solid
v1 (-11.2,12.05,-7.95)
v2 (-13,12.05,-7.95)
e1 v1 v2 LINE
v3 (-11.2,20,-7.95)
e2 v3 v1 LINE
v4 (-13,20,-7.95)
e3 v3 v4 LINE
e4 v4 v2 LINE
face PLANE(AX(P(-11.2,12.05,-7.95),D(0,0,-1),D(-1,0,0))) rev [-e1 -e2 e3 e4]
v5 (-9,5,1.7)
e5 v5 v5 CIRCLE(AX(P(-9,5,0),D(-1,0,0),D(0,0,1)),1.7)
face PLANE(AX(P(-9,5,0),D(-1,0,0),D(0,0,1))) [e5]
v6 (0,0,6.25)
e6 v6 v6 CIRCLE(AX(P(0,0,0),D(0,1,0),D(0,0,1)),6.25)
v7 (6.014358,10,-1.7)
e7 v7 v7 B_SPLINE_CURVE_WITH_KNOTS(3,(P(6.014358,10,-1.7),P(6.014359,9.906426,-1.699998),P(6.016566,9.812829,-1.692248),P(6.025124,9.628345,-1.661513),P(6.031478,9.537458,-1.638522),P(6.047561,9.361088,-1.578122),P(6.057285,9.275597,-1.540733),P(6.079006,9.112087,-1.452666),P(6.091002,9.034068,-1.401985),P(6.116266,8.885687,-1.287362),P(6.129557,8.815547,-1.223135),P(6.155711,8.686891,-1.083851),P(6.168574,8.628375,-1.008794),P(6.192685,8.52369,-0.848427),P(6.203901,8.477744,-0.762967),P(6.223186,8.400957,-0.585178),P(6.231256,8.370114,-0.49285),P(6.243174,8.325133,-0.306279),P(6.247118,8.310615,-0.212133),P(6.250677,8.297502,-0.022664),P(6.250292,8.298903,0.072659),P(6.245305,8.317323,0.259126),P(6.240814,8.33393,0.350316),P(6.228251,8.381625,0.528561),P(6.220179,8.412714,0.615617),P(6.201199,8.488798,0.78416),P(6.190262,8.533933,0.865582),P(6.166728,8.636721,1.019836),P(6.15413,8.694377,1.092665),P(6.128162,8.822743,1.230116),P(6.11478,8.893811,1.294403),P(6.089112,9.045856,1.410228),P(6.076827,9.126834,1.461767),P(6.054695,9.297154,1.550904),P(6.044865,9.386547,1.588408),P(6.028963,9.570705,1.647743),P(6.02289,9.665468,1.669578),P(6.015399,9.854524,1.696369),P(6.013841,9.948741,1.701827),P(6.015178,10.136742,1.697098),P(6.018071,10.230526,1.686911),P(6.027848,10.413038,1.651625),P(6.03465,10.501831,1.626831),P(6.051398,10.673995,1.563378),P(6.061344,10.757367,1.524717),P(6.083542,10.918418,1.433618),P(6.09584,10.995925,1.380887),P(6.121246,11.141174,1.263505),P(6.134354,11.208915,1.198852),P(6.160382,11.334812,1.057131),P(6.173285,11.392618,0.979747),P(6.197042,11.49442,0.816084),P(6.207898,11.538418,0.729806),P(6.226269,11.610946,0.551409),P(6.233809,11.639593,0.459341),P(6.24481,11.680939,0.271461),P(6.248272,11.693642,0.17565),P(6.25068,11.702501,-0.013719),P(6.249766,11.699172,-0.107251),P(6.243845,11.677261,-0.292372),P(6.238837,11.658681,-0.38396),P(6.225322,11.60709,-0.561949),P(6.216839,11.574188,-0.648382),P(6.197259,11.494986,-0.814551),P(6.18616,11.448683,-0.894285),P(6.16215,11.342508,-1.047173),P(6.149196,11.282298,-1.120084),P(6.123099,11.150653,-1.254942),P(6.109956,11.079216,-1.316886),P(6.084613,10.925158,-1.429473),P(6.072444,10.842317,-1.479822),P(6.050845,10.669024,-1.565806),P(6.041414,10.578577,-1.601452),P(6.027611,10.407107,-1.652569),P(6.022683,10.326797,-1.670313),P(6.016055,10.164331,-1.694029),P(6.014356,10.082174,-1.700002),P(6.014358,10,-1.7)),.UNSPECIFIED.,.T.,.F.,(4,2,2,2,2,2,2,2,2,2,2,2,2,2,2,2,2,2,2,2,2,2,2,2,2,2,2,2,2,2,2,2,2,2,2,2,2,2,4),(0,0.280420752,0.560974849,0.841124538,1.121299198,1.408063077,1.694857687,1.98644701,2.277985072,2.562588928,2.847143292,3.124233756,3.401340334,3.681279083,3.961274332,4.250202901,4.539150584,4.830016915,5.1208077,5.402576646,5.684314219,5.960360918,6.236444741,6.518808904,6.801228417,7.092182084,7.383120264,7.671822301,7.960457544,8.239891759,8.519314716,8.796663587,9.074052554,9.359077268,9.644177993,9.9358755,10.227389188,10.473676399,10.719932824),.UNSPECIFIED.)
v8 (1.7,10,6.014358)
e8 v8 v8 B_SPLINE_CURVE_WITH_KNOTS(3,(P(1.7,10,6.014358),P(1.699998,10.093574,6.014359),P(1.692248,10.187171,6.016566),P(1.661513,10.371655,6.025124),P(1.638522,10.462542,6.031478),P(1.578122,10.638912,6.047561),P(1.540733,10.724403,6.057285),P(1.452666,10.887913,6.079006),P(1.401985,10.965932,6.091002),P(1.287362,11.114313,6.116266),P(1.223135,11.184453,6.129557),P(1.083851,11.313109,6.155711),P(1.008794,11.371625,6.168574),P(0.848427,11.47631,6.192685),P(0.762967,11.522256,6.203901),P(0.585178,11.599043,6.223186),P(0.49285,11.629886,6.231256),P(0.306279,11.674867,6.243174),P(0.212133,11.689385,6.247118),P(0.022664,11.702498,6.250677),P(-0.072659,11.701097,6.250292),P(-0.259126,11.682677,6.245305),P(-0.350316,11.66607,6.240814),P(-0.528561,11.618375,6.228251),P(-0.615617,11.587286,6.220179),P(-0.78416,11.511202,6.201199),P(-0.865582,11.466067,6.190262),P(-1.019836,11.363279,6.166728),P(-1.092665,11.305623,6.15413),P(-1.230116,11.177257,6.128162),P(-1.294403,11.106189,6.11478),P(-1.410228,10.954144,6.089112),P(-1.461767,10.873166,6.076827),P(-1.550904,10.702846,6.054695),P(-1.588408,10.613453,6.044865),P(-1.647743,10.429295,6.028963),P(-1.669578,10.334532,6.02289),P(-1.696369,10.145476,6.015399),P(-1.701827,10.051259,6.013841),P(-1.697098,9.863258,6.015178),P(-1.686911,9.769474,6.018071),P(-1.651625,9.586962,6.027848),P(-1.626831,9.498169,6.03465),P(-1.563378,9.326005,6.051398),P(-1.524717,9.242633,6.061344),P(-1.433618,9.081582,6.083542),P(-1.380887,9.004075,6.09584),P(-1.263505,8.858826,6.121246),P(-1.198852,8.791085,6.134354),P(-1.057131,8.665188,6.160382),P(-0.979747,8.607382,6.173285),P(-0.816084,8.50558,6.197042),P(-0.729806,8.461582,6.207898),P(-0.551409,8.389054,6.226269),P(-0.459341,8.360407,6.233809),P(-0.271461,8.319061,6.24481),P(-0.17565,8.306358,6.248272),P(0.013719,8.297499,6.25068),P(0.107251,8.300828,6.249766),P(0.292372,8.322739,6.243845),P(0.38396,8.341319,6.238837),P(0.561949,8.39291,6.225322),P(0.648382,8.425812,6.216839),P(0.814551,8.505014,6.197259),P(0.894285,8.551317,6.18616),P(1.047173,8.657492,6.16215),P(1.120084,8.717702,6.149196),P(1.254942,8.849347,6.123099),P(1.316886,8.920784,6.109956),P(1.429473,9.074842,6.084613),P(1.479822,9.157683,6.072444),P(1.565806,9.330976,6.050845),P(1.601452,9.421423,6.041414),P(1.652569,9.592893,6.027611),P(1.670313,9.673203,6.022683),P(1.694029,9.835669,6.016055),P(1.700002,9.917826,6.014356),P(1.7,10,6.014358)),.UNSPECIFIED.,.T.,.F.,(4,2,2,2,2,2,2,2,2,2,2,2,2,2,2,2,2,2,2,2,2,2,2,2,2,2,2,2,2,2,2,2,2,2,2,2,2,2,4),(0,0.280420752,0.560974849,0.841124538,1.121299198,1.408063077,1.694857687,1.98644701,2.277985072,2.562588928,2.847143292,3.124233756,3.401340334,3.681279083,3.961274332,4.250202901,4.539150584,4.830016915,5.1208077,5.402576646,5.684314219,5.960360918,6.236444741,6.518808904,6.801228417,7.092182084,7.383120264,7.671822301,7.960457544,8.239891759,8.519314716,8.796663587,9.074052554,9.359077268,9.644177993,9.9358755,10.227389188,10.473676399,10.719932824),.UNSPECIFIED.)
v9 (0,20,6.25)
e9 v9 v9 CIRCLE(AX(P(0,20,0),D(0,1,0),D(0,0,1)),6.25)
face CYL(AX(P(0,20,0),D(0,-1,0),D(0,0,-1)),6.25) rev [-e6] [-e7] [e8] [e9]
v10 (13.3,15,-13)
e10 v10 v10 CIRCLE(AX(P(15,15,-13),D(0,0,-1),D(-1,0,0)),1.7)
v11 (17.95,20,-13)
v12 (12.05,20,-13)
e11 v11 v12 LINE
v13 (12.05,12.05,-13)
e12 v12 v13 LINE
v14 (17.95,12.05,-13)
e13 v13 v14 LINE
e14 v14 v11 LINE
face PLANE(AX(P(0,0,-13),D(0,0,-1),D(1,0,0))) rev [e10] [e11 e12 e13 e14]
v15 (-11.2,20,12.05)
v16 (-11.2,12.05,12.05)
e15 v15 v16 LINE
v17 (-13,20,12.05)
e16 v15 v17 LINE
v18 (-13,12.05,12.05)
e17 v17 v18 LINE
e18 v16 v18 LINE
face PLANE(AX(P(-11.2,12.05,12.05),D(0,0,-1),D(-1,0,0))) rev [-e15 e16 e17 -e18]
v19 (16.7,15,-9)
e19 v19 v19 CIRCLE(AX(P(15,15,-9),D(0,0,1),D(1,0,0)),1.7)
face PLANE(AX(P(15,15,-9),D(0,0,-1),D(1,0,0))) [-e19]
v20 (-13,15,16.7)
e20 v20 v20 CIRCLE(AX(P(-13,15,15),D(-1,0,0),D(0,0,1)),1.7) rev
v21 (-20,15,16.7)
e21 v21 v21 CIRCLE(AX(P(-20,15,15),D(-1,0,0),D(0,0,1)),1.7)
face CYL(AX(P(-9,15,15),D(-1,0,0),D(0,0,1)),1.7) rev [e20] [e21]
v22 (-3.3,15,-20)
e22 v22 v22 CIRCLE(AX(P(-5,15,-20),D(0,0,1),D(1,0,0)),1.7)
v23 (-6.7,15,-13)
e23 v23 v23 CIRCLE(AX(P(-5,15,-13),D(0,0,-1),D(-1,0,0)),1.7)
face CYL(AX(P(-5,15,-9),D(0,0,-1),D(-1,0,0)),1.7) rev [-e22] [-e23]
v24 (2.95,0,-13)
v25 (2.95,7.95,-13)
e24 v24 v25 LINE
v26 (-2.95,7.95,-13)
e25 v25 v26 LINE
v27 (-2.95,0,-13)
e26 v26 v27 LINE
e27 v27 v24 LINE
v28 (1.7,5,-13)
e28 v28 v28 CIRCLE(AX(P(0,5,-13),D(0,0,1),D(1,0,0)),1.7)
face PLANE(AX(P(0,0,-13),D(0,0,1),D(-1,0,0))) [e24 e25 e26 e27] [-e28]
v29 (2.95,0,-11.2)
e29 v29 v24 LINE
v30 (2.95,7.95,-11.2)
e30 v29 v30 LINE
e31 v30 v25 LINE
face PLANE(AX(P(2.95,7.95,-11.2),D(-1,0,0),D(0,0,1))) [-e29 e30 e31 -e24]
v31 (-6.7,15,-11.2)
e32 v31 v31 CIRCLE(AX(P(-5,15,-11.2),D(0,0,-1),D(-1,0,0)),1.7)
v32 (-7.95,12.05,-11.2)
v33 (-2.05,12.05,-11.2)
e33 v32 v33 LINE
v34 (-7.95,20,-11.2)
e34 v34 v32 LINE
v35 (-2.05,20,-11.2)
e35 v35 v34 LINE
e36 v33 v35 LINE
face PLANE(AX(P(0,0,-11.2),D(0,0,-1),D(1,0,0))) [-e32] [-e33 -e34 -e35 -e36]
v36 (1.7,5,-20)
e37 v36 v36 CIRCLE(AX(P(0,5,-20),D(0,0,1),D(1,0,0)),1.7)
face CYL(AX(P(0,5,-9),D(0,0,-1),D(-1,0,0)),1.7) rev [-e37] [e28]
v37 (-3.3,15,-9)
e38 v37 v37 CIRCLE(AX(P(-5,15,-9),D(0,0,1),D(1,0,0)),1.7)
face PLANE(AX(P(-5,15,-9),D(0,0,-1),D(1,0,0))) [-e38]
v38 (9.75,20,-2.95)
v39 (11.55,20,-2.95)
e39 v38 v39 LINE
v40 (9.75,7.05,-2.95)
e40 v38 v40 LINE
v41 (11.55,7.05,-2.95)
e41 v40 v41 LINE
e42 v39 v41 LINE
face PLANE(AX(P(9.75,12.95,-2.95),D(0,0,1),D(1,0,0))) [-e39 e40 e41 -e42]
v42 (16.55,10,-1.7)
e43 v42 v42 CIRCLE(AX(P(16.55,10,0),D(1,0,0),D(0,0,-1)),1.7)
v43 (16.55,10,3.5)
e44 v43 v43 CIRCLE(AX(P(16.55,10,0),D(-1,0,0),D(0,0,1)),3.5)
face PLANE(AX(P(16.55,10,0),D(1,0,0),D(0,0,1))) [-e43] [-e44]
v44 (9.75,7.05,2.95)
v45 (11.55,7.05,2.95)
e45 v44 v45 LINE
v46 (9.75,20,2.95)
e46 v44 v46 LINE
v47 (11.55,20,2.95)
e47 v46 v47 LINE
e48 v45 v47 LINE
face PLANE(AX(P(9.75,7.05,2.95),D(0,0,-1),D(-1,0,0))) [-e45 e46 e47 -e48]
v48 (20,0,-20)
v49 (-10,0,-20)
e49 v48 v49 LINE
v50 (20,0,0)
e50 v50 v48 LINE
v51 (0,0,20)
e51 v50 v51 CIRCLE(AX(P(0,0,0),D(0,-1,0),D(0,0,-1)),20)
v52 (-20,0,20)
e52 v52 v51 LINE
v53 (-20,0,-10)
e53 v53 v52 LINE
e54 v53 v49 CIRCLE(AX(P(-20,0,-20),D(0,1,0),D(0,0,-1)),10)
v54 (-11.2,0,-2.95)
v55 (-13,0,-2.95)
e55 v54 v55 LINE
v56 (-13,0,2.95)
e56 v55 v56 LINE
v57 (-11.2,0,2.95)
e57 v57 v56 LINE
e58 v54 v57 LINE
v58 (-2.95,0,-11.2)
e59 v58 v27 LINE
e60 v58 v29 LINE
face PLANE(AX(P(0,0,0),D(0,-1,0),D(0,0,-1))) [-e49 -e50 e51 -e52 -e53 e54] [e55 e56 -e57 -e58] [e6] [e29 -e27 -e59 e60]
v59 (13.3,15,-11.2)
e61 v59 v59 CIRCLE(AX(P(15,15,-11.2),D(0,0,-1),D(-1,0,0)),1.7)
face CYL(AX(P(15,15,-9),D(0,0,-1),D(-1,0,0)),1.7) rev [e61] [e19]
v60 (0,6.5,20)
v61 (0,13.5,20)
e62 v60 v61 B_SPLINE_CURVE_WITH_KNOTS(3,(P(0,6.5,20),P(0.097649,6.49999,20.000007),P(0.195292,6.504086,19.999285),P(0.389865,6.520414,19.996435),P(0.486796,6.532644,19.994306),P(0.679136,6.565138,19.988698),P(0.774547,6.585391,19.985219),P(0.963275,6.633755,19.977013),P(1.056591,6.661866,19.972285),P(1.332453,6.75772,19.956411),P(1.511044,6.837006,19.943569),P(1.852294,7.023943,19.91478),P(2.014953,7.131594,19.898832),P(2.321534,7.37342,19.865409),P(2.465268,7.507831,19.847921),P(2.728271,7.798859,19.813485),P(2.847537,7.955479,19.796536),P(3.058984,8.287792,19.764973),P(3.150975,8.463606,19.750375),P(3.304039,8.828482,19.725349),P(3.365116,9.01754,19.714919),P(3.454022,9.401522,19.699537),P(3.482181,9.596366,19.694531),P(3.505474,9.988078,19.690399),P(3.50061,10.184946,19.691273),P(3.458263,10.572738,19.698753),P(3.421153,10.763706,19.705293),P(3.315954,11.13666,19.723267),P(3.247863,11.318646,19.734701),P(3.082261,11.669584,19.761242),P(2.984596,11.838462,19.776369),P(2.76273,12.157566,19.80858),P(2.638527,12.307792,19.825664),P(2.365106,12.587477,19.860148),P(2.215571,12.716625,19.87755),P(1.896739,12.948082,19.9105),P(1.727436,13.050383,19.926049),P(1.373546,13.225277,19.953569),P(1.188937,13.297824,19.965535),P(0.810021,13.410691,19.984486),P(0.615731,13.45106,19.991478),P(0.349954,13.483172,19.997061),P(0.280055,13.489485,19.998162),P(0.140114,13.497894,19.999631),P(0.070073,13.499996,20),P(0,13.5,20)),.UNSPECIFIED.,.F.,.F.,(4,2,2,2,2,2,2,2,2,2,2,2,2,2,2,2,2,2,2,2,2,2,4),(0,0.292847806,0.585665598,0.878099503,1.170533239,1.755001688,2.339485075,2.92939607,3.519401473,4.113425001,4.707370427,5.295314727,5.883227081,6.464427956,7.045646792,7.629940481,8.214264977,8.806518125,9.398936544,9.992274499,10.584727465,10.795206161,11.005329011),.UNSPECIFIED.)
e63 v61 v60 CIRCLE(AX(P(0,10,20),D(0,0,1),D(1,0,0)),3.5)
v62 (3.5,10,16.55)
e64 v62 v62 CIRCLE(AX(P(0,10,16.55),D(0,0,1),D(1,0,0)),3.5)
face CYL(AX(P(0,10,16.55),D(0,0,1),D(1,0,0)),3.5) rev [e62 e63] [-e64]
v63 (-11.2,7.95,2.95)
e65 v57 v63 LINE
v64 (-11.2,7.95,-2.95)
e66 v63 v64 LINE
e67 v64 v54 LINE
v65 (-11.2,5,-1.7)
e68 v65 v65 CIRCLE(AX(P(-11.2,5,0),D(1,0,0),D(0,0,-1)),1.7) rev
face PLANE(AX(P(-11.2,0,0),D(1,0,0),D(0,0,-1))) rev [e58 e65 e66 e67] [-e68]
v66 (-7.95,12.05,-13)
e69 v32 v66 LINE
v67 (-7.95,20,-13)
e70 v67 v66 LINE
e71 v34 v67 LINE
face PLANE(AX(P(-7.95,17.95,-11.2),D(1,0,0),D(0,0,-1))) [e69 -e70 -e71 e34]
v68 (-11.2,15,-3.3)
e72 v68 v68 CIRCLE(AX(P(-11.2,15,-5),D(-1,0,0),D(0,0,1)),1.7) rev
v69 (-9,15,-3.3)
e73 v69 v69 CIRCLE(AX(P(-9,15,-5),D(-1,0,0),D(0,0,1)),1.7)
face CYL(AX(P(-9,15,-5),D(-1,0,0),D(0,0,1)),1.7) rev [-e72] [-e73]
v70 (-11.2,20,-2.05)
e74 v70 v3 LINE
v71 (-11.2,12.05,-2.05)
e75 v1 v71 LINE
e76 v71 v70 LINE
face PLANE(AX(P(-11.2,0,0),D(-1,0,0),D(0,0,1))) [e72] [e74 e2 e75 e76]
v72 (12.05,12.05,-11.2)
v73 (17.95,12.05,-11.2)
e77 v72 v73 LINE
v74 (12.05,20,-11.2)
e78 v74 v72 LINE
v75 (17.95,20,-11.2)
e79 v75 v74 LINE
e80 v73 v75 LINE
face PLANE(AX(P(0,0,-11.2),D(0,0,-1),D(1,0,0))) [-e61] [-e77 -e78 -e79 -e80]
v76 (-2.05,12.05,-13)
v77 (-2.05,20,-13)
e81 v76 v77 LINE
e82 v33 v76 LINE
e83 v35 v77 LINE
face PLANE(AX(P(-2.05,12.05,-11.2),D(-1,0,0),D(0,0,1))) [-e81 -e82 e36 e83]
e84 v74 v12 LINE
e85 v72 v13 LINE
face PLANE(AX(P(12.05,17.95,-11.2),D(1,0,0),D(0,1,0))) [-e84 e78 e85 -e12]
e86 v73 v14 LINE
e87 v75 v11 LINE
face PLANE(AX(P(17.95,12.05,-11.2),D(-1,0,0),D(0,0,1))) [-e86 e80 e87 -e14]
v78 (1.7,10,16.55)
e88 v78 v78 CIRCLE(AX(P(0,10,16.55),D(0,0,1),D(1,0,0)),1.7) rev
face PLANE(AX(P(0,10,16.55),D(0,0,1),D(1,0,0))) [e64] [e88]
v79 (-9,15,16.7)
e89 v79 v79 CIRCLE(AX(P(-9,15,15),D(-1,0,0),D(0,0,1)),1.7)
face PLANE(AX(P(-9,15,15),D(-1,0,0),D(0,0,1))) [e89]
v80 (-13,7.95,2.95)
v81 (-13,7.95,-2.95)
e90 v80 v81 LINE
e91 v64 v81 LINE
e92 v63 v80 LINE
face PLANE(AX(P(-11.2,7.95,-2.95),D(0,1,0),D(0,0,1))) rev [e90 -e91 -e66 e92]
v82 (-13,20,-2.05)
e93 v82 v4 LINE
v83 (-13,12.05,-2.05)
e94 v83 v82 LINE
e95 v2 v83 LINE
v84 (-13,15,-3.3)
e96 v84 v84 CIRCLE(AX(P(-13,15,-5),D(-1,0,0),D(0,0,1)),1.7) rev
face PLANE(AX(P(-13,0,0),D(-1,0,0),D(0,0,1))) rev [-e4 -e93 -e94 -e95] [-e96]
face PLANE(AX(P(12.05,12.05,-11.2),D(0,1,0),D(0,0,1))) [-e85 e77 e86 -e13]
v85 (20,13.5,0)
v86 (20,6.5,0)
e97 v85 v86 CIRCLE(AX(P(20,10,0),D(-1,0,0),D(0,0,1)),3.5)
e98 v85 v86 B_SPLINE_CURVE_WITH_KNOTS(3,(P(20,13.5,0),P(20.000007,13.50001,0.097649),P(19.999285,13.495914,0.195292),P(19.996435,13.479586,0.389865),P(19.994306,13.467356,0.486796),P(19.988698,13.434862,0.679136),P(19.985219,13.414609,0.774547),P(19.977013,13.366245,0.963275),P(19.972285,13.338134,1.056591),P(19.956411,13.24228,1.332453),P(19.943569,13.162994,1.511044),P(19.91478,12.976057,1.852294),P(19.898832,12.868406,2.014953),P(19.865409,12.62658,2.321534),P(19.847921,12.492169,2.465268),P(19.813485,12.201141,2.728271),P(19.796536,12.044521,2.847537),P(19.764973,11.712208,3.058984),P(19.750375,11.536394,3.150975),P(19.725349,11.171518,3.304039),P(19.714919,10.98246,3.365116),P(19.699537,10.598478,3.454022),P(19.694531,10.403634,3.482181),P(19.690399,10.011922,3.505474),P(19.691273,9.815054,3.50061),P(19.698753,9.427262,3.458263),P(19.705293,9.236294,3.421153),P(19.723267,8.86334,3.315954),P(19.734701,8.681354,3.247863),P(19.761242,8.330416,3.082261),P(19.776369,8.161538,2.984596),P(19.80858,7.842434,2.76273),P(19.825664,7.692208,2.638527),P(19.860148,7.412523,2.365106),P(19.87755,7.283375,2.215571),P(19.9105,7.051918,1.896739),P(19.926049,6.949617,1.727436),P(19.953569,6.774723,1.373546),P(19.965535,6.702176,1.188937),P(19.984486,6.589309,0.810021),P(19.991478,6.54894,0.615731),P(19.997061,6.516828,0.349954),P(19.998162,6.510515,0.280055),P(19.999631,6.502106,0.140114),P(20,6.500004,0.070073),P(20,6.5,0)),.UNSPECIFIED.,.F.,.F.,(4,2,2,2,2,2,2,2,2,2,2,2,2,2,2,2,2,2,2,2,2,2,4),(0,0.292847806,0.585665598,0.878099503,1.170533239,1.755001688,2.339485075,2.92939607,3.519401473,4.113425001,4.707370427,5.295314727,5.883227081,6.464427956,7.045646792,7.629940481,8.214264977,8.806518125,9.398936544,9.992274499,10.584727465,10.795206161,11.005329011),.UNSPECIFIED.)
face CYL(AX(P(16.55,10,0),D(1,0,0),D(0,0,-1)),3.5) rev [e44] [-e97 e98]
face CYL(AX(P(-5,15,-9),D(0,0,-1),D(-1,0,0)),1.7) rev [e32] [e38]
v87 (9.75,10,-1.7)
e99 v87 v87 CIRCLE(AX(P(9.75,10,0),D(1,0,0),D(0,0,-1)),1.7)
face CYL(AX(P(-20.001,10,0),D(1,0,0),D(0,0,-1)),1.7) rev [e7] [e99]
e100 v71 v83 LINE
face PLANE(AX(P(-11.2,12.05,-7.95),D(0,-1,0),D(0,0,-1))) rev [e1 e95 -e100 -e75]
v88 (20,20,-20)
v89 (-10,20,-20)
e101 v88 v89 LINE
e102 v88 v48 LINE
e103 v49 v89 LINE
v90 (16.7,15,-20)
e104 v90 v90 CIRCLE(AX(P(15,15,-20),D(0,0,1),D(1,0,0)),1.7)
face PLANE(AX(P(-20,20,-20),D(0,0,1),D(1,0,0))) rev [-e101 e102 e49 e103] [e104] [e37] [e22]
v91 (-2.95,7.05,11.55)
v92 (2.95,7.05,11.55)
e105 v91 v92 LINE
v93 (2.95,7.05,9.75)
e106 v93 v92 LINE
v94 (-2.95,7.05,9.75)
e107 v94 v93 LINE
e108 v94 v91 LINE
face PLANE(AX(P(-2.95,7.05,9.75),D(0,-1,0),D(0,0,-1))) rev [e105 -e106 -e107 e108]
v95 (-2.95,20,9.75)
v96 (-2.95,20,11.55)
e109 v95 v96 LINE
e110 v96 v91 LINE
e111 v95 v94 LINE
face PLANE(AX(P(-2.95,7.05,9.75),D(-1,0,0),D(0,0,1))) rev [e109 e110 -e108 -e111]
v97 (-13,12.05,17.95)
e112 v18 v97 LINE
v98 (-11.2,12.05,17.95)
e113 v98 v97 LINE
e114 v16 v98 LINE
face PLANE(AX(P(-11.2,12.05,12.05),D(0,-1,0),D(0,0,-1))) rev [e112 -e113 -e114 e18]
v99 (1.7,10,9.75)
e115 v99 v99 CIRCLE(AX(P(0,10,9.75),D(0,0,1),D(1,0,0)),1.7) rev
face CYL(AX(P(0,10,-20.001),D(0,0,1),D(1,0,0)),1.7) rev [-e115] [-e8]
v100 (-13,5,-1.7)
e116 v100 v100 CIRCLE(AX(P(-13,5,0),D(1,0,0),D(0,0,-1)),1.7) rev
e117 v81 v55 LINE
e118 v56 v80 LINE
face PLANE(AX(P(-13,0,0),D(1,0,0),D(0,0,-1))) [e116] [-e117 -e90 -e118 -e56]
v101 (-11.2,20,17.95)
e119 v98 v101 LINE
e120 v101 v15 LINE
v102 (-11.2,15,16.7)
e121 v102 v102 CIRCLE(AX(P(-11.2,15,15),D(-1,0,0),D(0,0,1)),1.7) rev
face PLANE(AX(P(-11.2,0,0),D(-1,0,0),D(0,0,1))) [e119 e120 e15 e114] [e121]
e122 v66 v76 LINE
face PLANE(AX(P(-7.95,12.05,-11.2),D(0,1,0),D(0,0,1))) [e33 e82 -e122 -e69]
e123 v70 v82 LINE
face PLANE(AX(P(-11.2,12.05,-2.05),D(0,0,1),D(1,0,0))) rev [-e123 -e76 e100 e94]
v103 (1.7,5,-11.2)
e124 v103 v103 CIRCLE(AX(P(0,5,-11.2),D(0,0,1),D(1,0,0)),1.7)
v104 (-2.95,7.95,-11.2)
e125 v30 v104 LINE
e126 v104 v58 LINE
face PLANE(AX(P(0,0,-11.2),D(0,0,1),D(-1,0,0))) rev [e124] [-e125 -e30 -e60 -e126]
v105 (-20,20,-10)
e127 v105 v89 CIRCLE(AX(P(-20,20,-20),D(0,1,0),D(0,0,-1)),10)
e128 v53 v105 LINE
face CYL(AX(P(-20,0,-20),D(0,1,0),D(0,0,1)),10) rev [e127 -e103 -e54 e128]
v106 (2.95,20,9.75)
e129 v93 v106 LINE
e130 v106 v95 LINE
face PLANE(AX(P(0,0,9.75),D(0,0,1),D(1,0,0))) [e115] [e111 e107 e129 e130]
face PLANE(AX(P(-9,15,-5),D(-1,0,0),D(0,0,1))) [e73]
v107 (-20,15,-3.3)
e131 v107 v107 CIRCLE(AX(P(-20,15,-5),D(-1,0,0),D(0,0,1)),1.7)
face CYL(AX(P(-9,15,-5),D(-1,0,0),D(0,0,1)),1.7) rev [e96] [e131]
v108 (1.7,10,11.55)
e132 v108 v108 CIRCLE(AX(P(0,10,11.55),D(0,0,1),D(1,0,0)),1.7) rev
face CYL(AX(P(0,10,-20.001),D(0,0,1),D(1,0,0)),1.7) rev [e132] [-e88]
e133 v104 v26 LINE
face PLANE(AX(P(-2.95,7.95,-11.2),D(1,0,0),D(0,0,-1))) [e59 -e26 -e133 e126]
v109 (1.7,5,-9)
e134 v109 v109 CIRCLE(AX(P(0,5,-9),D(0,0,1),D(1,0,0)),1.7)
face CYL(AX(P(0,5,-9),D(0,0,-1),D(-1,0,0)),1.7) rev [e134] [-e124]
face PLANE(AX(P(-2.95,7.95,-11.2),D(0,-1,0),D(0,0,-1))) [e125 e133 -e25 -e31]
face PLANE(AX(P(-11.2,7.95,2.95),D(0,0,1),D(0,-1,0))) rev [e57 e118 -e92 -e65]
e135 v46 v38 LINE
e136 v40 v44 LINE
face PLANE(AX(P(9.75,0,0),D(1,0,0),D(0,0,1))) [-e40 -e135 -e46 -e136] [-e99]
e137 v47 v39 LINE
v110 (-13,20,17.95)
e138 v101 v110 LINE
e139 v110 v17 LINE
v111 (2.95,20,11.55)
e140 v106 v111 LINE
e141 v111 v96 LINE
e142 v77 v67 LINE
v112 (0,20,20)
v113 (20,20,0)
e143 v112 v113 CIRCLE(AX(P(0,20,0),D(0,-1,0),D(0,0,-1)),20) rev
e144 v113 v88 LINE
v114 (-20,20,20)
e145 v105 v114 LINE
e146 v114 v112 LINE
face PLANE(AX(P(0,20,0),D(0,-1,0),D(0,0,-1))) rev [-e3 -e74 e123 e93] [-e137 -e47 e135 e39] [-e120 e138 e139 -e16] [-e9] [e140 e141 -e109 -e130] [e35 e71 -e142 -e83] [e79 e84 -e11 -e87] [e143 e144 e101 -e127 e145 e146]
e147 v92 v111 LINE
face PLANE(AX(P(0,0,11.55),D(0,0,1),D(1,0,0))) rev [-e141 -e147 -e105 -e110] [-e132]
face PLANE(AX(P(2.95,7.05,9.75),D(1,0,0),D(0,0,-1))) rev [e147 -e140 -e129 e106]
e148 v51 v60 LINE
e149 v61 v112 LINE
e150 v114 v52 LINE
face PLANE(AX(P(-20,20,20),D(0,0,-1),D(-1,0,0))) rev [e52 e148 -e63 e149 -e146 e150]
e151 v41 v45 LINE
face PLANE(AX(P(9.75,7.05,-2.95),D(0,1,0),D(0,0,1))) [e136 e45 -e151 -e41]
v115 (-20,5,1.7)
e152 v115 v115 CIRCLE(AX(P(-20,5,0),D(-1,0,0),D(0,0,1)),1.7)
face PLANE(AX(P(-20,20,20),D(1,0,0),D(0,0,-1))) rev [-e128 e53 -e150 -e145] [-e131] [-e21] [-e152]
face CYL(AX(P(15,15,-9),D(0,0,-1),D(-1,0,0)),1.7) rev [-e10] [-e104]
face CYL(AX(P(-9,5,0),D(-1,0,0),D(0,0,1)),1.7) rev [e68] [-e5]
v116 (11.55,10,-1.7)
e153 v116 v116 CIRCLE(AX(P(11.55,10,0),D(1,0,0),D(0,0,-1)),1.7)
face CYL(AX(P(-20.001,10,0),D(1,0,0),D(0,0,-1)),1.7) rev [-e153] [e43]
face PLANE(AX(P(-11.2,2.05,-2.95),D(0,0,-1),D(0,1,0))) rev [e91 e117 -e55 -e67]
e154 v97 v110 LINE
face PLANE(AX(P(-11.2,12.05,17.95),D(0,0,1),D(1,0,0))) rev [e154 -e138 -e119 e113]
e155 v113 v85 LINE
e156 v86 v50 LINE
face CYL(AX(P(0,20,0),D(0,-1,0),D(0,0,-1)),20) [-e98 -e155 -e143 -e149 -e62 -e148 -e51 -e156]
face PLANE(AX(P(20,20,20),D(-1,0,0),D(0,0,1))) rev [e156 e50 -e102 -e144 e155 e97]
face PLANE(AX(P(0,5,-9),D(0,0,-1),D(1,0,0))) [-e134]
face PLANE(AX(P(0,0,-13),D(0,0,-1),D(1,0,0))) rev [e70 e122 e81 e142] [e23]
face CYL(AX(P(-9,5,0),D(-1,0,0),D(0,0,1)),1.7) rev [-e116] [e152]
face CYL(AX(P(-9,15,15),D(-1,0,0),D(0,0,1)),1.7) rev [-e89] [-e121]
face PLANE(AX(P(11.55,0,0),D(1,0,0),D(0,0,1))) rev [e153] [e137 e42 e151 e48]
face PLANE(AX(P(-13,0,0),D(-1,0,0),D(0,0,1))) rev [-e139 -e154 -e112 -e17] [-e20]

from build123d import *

# Parameters (mm, degrees)
SKETCH1_W               = 40
SKETCH1_H               = 40
SKETCH1_R               = 6.25
BOSS_EXTRUDE1_DEPTH     = 20
SKETCH2_R               = 1.7
CUT_EXTRUDE1_DEPTH      = 11
CUT_EXTRUDE2_START      = -7
CUT_EXTRUDE2_DEPTH      = 1.8
CUT_EXTRUDE3_REACH      = 50.99
CUT_EXTRUDE3_END_RADIUS = 6.25
SKETCH4_R               = 1.7
CUT_EXTRUDE4_START      = -8.45
CUT_EXTRUDE4_DEPTH      = 1.8
SKETCH6_R               = 3.5
CUT_EXTRUDE5_DEPTH      = 3.45
FILLET1_R               = 20
CUT_EXTRUDE6_DEPTH      = 35.641016325


with BuildPart() as part:
    # Sketch1 → Boss-Extrude1 (new body)
    with BuildSketch(Plane(origin=(0, 0, 0), x_dir=(1, 0, 0), z_dir=(0, 1, 0))):
        Rectangle(SKETCH1_W, SKETCH1_H)
        with Locations(Location((0, 0, 0), (0, 0, 270))):
            Circle(SKETCH1_R, mode=Mode.SUBTRACT)
    extrude(amount=BOSS_EXTRUDE1_DEPTH)

    # Sketch2 → Cut-Extrude1 (cut)
    with BuildSketch(Plane.ZY.offset(20)):
        with Locations((-5, 15)):
            Circle(SKETCH2_R)
        with Locations((15, 15)):
            Circle(SKETCH2_R)
        with Locations((0, 5)):
            Circle(SKETCH2_R)
    cut_extrude1 = extrude(amount=-CUT_EXTRUDE1_DEPTH, mode=Mode.SUBTRACT)

    # Sketch3 → Cut-Extrude2 (cut)
    with BuildSketch(Plane.ZY.offset(20).offset(CUT_EXTRUDE2_START)):
        Polygon((-7.95, 12.05), (-2.05, 12.05), (-2.05, 17.95), (-2.05, 20), (-7.95, 20), (-7.95, 17.95), align=None)
        Polygon((12.05, 12.05), (17.95, 12.05), (17.95, 17.95), (17.95, 20), (12.05, 20), (12.05, 17.95), align=None)
        Polygon((-2.95, 7.95), (2.95, 7.95), (2.95, 2.05), (2.95, 0), (-2.95, 0), (-2.95, 2.05), align=None)
    cut_extrude2 = extrude(amount=-CUT_EXTRUDE2_DEPTH, mode=Mode.SUBTRACT)

    # Cut-Extrude3: up to this cylinder (the profile starts outside it)
    cut_extrude3_end = Plane(origin=(0, 10, 0), z_dir=(0, -1, 0)) * Cylinder(CUT_EXTRUDE3_END_RADIUS, 115.48, mode=Mode.PRIVATE)
    # Sketch4 → Cut-Extrude3 (cut, up to the surface)
    with BuildSketch(Plane.XY.offset(20), mode=Mode.PRIVATE) as cut_extrude3_sk1:
        with Locations((0, 10)):
            Circle(SKETCH4_R)
    cut_extrude3_tool1 = extrude(cut_extrude3_sk1.sketch, amount=-CUT_EXTRUDE3_REACH, mode=Mode.PRIVATE) - cut_extrude3_end
    cut_extrude3 = cut_extrude3_tool1.solids().sort_by_distance((0, 10, 20))[0]
    add(cut_extrude3, mode=Mode.SUBTRACT)

    # Sketch5 → Cut-Extrude4 (cut)
    with BuildSketch(Plane.XY.offset(20).offset(CUT_EXTRUDE4_START)):
        Polygon((-2.95, 12.95), (-2.95, 20), (2.95, 20), (2.95, 12.95), (2.95, 7.05), (-2.95, 7.05), align=None)
    cut_extrude4 = extrude(amount=-CUT_EXTRUDE4_DEPTH, mode=Mode.SUBTRACT)

    # Sketch6 → Cut-Extrude5 (cut)
    with BuildSketch(Plane.XY.offset(20)):
        with Locations((0, 10)):
            Circle(SKETCH6_R)
    cut_extrude5 = extrude(amount=-CUT_EXTRUDE5_DEPTH, mode=Mode.SUBTRACT)

    # Mirror1: Cut-Extrude1, Cut-Extrude2, Cut-Extrude3, Cut-Extrude4, Cut-Extrude5 across plane
    add(cut_extrude1.mirror(Plane(origin=(0, 0, 0), x_dir=(0.7071067811865476, 0, 0.7071067811865476), z_dir=(-0.7071067811865477, 0, 0.7071067811865475))), mode=Mode.SUBTRACT)
    add(cut_extrude2.mirror(Plane(origin=(0, 0, 0), x_dir=(0.7071067811865476, 0, 0.7071067811865476), z_dir=(-0.7071067811865477, 0, 0.7071067811865475))), mode=Mode.SUBTRACT)
    add(cut_extrude3.mirror(Plane(origin=(0, 0, 0), x_dir=(0.7071067811865476, 0, 0.7071067811865476), z_dir=(-0.7071067811865477, 0, 0.7071067811865475))), mode=Mode.SUBTRACT)
    add(cut_extrude4.mirror(Plane(origin=(0, 0, 0), x_dir=(0.7071067811865476, 0, 0.7071067811865476), z_dir=(-0.7071067811865477, 0, 0.7071067811865475))), mode=Mode.SUBTRACT)
    add(cut_extrude5.mirror(Plane(origin=(0, 0, 0), x_dir=(0.7071067811865476, 0, 0.7071067811865476), z_dir=(-0.7071067811865477, 0, 0.7071067811865475))), mode=Mode.SUBTRACT)

    # Fillet1
    # the kernel refuses this fillet: 20 mm, written as the material it takes off along each edge
    with BuildSketch(Plane(origin=(20, -50, 20), x_dir=(-1, 0, 0), z_dir=(0, 1, 0))) as fillet1_piece_1:
        with BuildLine():
            CenterArc((FILLET1_R, -FILLET1_R), FILLET1_R, 90, 90)
            Line((0, -FILLET1_R), (0, 0))
            Line((0, 0), (FILLET1_R, 0))
        make_face()
    extrude(amount=120, mode=Mode.SUBTRACT)

    # Sketch7 → Cut-Extrude6 (cut, through all)
    with BuildSketch(Plane(origin=(0, 20, 0), x_dir=(1, 0, 0), z_dir=(0, 1, 0))):
        with BuildLine():
            Line((-20, 10), (-20, 20))
            Line((-20, 20), (-10, 20))
            ThreePointArc((-10, 20), (-12.928932188, 12.928932188), (-20, 10))
        make_face()
    extrude(amount=-CUT_EXTRUDE6_DEPTH, mode=Mode.SUBTRACT)


solid = part.part
